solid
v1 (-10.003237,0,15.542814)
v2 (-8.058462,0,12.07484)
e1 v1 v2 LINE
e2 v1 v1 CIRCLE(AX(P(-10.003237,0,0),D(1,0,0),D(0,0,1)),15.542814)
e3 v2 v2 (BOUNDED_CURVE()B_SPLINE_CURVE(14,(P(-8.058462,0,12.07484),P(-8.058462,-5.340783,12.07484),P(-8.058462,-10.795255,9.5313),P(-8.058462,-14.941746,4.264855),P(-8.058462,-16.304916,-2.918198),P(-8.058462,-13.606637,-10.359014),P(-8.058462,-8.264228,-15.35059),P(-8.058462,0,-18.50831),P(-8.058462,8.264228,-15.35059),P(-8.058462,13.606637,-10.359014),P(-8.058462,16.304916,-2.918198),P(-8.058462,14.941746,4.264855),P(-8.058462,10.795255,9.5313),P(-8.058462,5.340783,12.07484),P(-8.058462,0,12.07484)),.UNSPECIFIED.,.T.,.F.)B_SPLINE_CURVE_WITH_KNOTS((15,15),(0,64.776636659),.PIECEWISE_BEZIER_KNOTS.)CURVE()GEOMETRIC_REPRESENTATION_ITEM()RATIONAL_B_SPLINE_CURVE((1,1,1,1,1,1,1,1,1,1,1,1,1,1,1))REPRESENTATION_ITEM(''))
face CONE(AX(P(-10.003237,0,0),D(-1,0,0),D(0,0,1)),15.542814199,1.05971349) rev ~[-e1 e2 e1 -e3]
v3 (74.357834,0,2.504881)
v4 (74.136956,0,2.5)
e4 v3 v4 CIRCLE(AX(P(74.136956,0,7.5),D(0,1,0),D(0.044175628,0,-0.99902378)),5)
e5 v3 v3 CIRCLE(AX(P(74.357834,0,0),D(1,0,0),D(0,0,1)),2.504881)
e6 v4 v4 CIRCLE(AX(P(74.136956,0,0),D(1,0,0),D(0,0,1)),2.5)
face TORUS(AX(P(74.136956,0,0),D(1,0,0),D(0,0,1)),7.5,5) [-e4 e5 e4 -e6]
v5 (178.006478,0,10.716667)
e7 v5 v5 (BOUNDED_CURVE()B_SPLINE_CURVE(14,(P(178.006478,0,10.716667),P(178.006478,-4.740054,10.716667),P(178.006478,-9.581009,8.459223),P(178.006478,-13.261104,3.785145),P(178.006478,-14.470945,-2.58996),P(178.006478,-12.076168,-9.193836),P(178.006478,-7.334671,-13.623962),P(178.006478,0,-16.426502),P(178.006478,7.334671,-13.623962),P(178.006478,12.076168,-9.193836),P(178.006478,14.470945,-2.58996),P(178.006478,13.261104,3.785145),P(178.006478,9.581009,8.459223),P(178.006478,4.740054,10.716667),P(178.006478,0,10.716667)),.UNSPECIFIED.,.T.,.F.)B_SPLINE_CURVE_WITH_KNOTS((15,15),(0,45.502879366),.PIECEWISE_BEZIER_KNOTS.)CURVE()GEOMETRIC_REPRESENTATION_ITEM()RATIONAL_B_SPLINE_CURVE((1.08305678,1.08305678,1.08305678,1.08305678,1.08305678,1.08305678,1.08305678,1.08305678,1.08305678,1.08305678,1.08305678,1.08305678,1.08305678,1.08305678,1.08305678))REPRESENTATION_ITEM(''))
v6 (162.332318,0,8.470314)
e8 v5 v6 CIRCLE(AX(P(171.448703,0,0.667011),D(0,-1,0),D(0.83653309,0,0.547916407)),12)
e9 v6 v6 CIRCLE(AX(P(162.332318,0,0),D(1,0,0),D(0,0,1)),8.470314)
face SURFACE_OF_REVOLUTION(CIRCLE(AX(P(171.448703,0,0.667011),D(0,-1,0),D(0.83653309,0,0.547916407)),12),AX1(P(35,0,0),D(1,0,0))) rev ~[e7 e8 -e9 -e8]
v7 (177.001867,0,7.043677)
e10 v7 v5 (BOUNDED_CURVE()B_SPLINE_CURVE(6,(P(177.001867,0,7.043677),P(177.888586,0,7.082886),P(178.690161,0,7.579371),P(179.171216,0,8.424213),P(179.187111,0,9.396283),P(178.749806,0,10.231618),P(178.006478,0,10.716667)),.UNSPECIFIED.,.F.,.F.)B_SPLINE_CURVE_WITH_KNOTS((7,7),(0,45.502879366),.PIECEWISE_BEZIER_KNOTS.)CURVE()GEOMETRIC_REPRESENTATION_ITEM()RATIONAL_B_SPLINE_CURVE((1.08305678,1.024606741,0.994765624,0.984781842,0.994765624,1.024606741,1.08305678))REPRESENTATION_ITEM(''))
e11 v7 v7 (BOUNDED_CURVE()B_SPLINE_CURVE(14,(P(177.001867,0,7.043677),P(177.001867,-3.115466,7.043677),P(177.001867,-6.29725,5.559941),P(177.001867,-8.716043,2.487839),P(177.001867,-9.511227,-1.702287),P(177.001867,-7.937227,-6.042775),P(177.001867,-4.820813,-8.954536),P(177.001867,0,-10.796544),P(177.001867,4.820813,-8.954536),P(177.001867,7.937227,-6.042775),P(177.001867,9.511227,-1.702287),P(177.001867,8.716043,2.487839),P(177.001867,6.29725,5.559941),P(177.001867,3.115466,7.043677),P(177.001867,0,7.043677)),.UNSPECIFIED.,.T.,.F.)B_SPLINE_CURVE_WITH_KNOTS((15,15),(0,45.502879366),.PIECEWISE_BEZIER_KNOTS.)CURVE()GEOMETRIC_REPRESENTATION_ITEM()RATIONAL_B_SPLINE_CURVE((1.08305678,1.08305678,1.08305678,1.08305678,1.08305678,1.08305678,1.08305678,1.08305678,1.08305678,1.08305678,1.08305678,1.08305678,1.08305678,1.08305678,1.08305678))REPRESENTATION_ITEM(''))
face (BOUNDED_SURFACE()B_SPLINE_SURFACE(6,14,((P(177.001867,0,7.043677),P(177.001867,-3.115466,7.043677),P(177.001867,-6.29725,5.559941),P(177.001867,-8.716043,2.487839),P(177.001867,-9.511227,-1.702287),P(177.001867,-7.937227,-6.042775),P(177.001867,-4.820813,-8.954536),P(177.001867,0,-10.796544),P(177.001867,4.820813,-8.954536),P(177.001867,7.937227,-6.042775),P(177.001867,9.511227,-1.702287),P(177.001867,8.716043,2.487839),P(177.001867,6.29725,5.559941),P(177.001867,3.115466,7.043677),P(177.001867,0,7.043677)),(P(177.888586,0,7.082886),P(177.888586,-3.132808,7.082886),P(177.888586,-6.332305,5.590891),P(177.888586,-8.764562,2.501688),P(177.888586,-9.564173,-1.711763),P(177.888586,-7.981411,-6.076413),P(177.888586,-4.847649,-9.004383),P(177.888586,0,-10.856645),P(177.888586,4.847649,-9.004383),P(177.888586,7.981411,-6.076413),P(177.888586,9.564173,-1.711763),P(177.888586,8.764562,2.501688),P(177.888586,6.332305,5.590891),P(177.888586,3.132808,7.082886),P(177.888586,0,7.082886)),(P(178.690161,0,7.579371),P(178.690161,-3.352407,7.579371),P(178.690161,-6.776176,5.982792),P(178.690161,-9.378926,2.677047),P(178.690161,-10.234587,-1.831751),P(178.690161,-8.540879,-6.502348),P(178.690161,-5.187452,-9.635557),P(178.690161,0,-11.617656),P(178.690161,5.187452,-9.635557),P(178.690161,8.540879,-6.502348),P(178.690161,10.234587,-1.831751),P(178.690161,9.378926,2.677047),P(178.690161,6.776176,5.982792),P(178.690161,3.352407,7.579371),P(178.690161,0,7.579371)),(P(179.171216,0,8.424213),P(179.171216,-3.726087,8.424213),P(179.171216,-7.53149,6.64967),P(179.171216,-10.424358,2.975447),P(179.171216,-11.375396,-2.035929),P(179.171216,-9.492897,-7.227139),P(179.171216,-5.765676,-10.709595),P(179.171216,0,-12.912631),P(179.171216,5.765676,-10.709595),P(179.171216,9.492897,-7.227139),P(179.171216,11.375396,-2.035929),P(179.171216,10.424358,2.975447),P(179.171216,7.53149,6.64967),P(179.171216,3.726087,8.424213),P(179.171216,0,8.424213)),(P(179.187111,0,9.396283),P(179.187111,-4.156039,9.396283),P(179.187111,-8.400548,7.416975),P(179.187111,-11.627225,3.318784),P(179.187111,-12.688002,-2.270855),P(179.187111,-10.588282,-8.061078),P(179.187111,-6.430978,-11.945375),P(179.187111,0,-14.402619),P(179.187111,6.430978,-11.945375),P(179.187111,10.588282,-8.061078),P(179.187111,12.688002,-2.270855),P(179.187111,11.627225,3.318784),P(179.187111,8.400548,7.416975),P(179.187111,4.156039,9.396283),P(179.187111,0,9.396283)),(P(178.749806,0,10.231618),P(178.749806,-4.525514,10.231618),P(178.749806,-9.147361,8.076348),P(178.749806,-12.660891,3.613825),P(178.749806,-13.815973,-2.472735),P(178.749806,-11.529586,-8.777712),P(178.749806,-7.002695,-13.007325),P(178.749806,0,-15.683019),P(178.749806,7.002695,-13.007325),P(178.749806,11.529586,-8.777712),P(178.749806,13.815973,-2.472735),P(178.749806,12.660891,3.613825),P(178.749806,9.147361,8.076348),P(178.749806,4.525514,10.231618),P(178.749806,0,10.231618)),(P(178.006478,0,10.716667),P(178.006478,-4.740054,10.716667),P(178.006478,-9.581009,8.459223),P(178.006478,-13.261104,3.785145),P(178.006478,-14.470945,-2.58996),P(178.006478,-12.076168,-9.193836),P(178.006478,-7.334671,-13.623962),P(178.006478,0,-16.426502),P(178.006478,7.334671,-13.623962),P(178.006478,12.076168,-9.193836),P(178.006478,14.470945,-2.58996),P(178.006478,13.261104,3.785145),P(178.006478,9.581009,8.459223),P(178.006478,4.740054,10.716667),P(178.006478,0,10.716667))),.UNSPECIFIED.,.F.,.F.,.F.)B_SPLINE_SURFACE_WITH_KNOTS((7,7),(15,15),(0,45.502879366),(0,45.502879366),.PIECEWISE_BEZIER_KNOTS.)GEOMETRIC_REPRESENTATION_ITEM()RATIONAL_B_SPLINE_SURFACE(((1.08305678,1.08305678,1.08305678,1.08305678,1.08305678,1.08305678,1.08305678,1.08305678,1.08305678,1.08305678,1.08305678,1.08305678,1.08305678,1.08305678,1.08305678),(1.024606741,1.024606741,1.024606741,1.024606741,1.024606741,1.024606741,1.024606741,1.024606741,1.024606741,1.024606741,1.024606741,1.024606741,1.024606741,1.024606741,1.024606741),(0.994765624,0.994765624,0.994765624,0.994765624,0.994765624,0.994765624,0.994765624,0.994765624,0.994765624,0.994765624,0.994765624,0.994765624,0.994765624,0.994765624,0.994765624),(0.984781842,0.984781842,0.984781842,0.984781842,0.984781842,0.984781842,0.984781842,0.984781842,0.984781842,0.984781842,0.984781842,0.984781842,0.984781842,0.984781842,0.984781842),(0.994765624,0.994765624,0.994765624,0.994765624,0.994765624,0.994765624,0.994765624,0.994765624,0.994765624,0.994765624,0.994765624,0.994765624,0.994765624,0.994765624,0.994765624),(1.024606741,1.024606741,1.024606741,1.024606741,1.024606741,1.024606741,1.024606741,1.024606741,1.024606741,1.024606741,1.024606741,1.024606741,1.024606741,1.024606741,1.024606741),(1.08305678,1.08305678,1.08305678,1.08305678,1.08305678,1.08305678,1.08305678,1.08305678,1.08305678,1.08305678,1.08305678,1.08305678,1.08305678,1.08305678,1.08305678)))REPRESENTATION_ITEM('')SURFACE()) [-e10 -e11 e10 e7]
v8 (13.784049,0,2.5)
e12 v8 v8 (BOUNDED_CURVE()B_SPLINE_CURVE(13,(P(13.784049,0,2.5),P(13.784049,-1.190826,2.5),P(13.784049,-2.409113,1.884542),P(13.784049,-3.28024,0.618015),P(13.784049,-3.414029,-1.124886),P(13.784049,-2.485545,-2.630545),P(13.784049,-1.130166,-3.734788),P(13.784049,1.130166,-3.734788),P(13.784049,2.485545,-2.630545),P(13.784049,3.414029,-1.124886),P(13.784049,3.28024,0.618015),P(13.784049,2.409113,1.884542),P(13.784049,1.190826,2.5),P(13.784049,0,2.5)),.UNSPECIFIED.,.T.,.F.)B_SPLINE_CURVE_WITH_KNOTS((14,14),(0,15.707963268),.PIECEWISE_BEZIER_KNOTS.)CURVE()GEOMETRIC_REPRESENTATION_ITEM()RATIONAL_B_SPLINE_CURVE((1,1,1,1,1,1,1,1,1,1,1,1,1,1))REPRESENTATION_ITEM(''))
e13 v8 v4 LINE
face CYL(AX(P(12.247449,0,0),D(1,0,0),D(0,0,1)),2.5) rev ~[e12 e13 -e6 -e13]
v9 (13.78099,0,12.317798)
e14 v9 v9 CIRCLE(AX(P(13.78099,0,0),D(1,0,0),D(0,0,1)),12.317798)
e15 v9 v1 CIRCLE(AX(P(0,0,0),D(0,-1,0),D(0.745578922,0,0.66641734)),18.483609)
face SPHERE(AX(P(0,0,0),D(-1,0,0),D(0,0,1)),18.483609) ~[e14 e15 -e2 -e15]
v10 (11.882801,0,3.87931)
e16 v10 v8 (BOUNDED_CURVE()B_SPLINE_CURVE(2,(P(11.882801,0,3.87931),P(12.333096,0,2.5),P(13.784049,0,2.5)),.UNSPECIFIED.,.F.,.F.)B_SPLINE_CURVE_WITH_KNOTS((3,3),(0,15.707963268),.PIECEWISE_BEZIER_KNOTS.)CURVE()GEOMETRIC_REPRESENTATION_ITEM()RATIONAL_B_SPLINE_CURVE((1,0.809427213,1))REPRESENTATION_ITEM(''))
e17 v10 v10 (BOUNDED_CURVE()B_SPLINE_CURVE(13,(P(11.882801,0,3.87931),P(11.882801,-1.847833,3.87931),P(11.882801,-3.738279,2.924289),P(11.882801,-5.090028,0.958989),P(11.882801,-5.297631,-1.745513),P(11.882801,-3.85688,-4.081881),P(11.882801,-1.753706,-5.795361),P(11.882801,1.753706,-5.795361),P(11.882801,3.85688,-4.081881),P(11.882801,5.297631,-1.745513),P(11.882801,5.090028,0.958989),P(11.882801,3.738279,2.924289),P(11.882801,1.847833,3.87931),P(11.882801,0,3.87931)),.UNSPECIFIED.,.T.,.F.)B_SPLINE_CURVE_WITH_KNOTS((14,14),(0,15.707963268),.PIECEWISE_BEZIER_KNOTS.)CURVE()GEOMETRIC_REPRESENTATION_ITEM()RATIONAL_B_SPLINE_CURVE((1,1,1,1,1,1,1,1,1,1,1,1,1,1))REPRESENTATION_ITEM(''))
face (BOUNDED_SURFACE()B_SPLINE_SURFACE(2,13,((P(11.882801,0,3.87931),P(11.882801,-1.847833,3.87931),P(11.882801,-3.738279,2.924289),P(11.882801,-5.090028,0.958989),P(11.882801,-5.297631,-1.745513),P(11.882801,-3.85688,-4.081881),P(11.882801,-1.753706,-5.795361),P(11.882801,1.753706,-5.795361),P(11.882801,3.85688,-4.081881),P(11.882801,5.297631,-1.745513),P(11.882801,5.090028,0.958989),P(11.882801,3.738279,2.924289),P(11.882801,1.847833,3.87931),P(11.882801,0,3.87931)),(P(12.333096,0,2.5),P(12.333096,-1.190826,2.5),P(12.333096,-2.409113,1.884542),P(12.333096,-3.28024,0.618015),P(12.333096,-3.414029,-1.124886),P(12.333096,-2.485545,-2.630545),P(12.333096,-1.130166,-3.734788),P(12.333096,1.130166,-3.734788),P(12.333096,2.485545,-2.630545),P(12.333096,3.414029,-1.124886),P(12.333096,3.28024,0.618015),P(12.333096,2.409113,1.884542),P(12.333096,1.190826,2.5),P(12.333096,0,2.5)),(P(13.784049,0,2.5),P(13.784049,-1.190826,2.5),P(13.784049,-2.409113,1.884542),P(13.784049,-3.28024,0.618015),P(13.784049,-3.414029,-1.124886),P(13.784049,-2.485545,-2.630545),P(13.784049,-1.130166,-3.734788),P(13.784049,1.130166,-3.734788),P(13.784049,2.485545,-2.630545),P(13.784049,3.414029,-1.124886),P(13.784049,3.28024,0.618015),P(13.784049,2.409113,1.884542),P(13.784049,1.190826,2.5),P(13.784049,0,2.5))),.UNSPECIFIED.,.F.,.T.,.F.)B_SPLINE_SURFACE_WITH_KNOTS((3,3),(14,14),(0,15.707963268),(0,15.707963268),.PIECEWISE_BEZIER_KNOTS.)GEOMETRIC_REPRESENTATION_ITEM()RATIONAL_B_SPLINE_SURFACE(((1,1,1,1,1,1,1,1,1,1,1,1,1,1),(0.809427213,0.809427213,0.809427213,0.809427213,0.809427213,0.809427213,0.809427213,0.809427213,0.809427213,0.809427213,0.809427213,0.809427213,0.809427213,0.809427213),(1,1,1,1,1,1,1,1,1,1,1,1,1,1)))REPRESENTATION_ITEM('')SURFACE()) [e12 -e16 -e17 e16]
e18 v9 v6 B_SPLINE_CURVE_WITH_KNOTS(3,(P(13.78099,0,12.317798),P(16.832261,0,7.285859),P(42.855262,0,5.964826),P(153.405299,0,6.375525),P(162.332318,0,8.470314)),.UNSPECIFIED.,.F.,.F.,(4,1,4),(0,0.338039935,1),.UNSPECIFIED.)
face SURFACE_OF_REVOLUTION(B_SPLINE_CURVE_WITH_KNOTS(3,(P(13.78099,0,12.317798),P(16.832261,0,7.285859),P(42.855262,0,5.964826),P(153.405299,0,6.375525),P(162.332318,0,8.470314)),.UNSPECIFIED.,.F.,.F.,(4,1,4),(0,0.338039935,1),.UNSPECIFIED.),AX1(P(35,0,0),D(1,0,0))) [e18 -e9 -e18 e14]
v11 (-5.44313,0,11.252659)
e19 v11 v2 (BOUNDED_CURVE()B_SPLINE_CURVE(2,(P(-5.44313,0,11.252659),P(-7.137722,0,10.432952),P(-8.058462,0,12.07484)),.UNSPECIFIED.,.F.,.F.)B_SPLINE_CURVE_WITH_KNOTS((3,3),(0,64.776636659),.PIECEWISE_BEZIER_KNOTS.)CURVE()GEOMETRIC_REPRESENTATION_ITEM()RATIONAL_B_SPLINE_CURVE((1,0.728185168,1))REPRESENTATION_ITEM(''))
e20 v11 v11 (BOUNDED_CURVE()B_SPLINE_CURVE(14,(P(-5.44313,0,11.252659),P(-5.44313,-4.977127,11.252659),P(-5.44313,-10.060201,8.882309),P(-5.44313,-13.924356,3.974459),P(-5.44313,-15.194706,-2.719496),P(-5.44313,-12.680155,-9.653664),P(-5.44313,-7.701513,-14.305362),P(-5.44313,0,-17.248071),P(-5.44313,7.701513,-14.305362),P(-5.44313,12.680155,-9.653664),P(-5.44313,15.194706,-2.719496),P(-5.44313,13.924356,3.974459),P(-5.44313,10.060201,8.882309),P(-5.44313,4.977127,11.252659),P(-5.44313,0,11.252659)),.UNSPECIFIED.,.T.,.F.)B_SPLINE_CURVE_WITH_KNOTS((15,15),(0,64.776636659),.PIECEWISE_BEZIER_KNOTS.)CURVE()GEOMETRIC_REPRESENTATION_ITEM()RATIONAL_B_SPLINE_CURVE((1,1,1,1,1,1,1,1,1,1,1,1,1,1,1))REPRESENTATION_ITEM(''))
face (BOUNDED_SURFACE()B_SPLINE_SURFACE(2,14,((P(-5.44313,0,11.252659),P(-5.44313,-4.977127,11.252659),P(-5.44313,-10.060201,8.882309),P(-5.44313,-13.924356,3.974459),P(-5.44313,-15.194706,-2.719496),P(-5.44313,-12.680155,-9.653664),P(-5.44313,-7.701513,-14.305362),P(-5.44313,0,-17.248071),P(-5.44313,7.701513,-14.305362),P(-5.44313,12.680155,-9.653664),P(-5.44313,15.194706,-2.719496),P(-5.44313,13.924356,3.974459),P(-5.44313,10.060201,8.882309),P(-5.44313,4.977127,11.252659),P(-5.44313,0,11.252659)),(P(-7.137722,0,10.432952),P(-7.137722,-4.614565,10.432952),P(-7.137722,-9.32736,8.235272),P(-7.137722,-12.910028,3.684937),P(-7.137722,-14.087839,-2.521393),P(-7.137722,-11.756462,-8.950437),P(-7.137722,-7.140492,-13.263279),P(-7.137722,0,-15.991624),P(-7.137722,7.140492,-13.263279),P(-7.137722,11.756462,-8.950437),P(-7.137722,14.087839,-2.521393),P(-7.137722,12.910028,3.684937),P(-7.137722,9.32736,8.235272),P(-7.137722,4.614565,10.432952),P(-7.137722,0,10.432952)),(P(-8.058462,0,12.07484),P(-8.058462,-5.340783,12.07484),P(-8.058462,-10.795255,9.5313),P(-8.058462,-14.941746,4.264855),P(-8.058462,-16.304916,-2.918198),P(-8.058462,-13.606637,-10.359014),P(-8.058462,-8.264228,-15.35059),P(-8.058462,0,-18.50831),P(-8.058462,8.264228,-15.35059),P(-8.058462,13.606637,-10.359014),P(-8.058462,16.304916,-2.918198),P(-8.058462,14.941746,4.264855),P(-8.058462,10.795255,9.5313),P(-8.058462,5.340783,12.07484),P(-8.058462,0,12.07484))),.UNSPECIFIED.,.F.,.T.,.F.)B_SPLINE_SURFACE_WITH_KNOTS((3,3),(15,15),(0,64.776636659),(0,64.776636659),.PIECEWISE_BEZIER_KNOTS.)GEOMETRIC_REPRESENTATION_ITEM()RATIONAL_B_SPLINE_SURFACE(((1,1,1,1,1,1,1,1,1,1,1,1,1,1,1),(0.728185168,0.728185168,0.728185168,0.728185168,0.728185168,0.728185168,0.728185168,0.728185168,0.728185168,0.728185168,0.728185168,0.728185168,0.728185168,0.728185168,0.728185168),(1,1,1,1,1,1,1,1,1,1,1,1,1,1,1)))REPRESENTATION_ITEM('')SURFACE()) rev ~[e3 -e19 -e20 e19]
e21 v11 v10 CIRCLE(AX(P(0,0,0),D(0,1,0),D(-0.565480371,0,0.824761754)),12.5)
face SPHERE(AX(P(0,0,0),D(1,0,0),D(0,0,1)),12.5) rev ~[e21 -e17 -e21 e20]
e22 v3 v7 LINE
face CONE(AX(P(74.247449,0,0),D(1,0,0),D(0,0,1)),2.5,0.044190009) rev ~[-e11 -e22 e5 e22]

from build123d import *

# Parameters (mm, degrees)
F2_R = 2


# Not quite as in the source:
# - a fillet or chamfer that OpenCascade refuses, or shapes differently, is made with other operations: its cross-section is extruded or revolved along the edge and cut away or added


with BuildPart() as f1:
    # F0 (on Front) → F1 (revolve)
    with BuildSketch(Plane.XZ):
        with BuildLine():
            ThreePointArc((-7.0685046336, 10.3095219212), (4.6853520259, 11.5886788028), (12.2474487139, 2.5))
            Line((12.2474487139, 2.5), (74.2474487139, 2.5))
            Line((74.2474487139, 2.5), (181.4870995989, 7.242008176))
            ThreePointArc((181.4870995989, 7.242008176), (172.2166286642, 12.6424148054), (162.3323179763, 8.4703139749))
            add(Edge.make_bspline(
                [(13.7809895682, 12.3177978136), (16.8322612088, 7.285858607), (42.8552617273, 5.9648264947), (153.4052985384, 6.3755253316), (162.3323179763, 8.4703139749)],
                knots=[0, 0, 0, 0, 0.3380399349, 1, 1, 1, 1], degree=3))
            ThreePointArc((13.7809895682, 12.3177978136), (2.4835532955, 18.3159979112), (-10.003236638, 15.5428141988))
            Line((-10.003236638, 15.5428141988), (-7.0685046336, 10.3095219212))
        make_face()
    revolve(axis=Axis((35, 0, 0), (1, 0, 0)))

    # F2
    f2_edges = [f1.edges().sort_by_distance(p)[0] for p in [
        (181.4871, 0, -7.242008),
        (-7.068505, 0, -10.309522),
        (12.247449, 0, -2.5),
    ]]
    fillet(f2_edges, radius=F2_R)

    # F3: fillet of radius 5 on 1 edges, made by hand

    # F3_s1 → F3_t2 (revolve, cut)
    with BuildSketch(Plane.XZ):
        with BuildLine():
            ThreePointArc((74.3578338514, 2.5048810978), (74.2474217443, 2.5012204234), (74.136955711, 2.5))
            Line((74.136955711, 2.5), (74.136955711, 2.4))
            Line((74.136955711, 2.4), (74.249658574, 2.4))
            Line((74.249658574, 2.4), (74.3622514143, 2.4049787198))
            Line((74.3622514143, 2.4049787198), (74.3578338514, 2.5048810978))
        make_face()
    revolve(axis=Axis((74.2474487139, 0, 0), (1, 0, 0)), mode=Mode.SUBTRACT)


solid = f1.part
